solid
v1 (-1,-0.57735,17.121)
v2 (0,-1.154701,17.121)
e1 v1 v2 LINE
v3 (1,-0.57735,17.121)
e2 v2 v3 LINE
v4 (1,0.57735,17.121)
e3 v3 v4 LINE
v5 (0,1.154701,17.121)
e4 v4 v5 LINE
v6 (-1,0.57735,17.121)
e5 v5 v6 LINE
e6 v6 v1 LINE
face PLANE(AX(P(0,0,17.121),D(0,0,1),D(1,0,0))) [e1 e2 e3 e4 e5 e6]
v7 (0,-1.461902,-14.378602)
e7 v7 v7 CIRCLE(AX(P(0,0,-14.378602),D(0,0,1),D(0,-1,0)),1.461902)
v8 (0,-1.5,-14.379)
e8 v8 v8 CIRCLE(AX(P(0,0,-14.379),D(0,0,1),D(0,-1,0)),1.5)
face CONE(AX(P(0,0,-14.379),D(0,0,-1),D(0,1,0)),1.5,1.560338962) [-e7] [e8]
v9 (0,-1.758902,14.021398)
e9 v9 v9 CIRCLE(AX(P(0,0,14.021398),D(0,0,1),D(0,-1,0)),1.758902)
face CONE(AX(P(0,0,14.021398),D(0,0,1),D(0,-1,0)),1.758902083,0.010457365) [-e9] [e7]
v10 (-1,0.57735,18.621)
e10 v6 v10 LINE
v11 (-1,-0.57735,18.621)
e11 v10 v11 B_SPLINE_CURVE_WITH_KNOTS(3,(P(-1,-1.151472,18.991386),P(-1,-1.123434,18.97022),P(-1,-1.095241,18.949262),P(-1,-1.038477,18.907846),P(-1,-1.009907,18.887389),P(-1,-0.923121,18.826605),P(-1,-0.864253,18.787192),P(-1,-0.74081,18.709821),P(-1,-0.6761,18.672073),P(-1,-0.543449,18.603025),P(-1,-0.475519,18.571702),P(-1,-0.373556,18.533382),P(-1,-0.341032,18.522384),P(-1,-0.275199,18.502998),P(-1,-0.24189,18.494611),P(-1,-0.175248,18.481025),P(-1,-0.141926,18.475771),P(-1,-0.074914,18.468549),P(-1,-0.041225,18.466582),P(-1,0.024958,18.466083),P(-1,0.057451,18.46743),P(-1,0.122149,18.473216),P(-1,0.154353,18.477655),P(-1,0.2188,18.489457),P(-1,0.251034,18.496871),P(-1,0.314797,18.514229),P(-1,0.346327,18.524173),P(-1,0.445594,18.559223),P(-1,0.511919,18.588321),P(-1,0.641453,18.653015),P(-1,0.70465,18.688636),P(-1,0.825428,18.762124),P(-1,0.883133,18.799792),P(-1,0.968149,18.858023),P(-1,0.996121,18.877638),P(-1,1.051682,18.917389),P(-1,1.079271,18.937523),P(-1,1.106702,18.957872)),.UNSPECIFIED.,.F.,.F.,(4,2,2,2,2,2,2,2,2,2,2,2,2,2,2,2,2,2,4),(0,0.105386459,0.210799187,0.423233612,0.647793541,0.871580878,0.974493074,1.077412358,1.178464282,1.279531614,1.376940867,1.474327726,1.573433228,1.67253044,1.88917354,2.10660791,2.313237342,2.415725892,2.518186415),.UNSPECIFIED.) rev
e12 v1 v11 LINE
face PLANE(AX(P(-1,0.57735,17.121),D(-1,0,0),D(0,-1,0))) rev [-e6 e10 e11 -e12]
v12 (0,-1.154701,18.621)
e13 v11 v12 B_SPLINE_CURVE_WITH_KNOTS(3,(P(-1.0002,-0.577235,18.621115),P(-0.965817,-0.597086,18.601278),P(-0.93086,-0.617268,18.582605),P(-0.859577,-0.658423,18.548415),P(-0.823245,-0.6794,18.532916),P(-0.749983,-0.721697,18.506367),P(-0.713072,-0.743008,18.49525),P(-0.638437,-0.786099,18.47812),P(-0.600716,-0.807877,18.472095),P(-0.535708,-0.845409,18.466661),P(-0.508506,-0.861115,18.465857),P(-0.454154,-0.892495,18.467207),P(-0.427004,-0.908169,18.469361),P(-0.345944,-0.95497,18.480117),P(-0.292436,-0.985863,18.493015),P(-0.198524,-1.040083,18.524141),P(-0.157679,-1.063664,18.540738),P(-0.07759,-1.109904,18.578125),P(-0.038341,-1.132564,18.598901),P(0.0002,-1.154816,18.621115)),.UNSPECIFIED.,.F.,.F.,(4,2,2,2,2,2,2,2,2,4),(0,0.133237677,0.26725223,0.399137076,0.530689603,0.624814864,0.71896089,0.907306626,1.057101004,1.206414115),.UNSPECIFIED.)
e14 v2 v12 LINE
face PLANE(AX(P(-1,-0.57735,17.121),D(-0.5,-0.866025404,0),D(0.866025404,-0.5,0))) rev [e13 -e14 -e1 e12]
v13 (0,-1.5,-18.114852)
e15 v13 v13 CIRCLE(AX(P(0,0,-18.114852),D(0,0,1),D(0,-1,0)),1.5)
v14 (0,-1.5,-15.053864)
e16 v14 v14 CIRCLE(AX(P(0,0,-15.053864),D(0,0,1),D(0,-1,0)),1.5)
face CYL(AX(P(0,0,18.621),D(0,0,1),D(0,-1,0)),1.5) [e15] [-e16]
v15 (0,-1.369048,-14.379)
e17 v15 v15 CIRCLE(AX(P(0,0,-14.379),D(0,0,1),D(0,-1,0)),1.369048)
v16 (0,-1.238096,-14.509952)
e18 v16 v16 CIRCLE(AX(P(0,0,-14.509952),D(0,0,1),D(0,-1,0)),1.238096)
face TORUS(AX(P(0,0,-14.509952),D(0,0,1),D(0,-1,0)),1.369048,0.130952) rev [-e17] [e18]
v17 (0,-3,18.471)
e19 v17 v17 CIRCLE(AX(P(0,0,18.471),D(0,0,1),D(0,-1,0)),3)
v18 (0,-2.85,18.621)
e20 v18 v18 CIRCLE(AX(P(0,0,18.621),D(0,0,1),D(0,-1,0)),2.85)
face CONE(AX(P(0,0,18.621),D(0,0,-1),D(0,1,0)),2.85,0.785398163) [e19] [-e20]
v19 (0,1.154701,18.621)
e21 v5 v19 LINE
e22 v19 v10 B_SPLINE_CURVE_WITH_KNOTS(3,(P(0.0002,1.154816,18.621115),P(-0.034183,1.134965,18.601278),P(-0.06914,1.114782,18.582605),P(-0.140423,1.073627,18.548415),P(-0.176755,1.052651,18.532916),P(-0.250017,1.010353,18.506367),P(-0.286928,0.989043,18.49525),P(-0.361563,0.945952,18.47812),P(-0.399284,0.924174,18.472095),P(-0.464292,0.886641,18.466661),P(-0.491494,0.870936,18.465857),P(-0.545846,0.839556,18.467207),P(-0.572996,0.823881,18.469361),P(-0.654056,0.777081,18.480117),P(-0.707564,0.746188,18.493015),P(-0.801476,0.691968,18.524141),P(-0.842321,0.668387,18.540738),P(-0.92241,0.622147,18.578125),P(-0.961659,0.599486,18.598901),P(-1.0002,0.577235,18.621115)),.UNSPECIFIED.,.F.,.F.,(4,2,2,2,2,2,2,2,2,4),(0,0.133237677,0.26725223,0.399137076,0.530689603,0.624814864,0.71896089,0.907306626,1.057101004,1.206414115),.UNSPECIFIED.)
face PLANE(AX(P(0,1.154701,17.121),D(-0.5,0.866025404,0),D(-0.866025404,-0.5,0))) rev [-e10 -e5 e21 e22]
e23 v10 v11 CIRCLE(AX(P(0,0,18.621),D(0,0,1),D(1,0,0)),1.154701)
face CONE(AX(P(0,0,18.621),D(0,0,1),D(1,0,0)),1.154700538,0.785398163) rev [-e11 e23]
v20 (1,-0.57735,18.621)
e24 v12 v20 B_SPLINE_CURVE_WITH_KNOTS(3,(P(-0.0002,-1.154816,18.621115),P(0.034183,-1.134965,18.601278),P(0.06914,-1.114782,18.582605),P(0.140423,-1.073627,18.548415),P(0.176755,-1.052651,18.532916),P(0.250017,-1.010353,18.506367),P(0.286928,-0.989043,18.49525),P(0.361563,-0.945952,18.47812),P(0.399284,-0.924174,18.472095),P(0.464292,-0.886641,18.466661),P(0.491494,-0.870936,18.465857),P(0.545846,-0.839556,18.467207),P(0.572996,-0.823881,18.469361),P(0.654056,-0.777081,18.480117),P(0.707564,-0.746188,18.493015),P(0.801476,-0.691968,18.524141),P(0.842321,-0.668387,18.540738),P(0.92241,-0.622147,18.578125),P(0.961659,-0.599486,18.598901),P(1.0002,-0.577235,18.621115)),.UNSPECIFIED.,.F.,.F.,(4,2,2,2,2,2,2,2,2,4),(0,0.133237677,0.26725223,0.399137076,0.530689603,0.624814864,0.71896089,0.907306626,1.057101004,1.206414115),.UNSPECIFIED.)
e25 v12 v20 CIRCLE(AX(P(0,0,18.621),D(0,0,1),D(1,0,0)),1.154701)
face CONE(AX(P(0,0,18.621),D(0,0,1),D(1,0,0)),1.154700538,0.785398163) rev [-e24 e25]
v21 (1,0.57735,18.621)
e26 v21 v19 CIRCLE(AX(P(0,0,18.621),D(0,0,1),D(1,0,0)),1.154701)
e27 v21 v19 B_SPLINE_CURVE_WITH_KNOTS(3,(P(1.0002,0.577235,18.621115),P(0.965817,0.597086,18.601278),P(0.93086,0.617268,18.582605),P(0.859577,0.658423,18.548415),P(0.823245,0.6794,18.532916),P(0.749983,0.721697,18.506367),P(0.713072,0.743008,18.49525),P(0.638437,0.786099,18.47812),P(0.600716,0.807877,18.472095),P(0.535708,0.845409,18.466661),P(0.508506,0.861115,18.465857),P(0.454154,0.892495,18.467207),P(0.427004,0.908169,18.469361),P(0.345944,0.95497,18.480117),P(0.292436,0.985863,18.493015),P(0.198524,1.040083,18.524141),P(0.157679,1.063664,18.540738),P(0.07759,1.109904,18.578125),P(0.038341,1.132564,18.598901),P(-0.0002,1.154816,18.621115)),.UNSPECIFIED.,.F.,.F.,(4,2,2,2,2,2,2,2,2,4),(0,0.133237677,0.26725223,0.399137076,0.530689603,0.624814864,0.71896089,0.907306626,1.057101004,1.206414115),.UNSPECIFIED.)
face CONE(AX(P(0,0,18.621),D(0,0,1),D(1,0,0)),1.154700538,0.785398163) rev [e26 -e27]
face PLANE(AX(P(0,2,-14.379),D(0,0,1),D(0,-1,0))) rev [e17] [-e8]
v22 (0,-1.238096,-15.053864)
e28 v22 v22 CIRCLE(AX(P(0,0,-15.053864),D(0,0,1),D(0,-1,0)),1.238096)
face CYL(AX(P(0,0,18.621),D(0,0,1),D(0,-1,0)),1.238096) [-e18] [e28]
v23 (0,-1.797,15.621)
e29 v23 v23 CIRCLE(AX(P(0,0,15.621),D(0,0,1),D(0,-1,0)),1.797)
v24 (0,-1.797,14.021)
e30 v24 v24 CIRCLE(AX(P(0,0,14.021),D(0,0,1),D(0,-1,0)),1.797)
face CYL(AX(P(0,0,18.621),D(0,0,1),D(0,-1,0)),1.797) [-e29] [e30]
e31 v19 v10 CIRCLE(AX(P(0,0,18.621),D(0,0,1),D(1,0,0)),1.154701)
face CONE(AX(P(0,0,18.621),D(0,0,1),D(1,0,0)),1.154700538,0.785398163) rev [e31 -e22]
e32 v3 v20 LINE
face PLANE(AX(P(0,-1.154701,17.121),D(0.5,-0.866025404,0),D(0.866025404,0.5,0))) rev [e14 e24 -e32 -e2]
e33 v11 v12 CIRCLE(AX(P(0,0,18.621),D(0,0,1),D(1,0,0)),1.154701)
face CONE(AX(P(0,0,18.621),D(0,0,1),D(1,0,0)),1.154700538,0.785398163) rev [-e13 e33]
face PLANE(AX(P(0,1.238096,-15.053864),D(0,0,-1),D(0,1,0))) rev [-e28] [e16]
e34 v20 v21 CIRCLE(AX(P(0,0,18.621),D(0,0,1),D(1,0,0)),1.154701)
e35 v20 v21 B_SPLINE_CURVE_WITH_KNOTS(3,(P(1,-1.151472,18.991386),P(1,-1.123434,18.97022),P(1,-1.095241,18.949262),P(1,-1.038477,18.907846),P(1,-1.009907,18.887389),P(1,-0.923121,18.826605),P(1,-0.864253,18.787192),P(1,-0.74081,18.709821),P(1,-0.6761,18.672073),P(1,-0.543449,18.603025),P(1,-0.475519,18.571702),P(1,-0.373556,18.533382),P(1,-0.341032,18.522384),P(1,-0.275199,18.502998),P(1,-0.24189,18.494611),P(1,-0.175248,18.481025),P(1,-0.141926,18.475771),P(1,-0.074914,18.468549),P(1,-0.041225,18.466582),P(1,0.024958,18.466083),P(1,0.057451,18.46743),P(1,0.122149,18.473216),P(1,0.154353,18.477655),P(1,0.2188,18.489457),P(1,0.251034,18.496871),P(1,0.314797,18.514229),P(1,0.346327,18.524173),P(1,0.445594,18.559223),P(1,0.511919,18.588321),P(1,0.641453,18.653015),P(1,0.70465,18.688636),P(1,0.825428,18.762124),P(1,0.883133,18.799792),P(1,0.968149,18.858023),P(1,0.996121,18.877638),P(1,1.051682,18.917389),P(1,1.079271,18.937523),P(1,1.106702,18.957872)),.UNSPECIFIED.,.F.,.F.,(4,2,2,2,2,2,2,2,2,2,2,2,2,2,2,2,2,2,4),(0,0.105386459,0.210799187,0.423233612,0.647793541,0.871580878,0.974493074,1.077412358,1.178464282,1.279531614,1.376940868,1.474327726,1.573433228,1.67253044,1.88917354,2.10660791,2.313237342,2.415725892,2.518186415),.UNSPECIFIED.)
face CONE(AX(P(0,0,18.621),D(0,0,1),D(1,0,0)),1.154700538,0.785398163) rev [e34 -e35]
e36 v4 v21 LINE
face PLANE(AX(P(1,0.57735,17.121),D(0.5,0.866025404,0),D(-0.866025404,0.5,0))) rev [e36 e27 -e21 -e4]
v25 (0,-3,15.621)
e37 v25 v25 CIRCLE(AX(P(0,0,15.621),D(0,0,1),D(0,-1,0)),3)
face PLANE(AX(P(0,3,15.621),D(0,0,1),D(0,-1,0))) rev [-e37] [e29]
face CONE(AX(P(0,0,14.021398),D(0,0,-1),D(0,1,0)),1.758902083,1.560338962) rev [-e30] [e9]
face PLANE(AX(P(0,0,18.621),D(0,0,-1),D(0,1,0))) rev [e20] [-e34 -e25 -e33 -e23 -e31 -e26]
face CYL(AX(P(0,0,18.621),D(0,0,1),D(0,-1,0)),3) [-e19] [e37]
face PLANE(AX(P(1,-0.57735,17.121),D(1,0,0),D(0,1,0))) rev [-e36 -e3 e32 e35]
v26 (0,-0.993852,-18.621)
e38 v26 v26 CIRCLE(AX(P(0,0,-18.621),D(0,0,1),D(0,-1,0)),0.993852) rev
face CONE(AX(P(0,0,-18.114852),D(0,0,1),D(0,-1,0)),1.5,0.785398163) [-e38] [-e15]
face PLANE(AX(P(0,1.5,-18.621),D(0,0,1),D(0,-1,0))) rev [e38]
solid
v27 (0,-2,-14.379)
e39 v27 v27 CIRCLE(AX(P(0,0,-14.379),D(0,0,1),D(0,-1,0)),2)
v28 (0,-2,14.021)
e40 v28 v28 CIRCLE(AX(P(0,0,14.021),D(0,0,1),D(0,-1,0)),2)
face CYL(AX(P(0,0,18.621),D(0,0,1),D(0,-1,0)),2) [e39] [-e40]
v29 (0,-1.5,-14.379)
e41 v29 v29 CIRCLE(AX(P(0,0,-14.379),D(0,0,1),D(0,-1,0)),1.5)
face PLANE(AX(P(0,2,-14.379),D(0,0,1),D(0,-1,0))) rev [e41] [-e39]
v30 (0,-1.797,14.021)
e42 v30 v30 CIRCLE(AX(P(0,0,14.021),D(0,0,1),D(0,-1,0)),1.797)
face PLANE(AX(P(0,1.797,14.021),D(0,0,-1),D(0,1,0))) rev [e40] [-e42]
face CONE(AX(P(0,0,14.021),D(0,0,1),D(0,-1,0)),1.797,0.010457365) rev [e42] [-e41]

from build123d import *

# Parameters (mm, degrees)
CUT_EXTRUDE1_START = 18.621
CUT_EXTRUDE1_DEPTH = 1.5
CHAMFER2_SIZE      = 0.506148016


# Read off the part's stored shape, not the designer's step: Cut-Revolve-Thin1
with BuildPart() as part:
    # Sketch3 → Revolve1 (revolve)
    with BuildSketch(Plane(origin=(0, 0, 0), x_dir=(0, 0, -1), z_dir=(1, 0, 0)), mode=Mode.PRIVATE) as revolve1_sk:
        with BuildLine():
            Line((-18.621, 0), (-18.621, 2.805))
            Line((-18.621, 2.805), (-18.621, 3))
            Line((-18.621, 3), (-15.816, 3))
            Line((-15.816, 3), (-15.621, 3))
            Line((-15.621, 3), (-15.621, 1.797))
            Line((-15.621, 1.797), (-14.021, 1.797))
            Line((-14.021, 1.797), (-14.021, 2))
            Line((-14.021, 2), (14.379, 2))
            Line((14.379, 2), (14.379, 1.36904775))
            ThreePointArc((14.379, 1.36904775), (14.417355026, 1.276450526), (14.50995225, 1.2380955))
            Line((14.50995225, 1.2380955), (15.053864022, 1.2380955))
            Line((15.053864022, 1.2380955), (15.053864022, 1.5))
            Line((15.053864022, 1.5), (18.246, 1.5))
            Line((18.246, 1.5), (18.621, 1.5))
            Line((18.621, 1.5), (18.621, 0))
            Line((18.621, 0), (-18.621, 0))
        make_face()
    revolve(revolve1_sk.sketch.rotate(Axis((0, 0, 18.621), (0, 0, -1)), 180), axis=Axis((0, 0, 18.621), (0, 0, -1)))

    # Cut-Revolve-Thin1 outline → Cut-Revolve-Thin1 (revolve, cut)
    with BuildSketch(Plane.XZ):
        Polygon((1.758902083, 14.021398418), (1.461902083, -14.378601582), (1.5, -14.379), (1.797, 14.021), align=None)
    revolve(axis=Axis((0, 0, 0), (0, 0, 1)), mode=Mode.SUBTRACT)

    # Sketch4 → Cut-Extrude1 (cut)
    with BuildSketch(Plane.XY.offset(CUT_EXTRUDE1_START)):
        Polygon((0, 1.154700538), (-1, 0.577350269), (-1, -0.577350269), (0, -1.154700538), (1, -0.577350269), (1, 0.577350269), align=None)
    extrude(amount=-CUT_EXTRUDE1_DEPTH, mode=Mode.SUBTRACT)

    # Cut-Extrude2 cone 1 section (through the dimple's axis) → Cut-Extrude2 (revolve, cut)
    with BuildSketch(Plane(origin=(0, 0, 18.621), x_dir=(0, -1, 0), z_dir=(1, 0, 0))):
        Polygon((0, 0), (1.154700538, 0), (0, 1.154700538), align=None)
    revolve(axis=Axis((0, 0, 18.621), (0, 0, -1)), mode=Mode.SUBTRACT)

    # Chamfer2
    chamfer2_edges = [part.edges().sort_by_distance(p)[0] for p in [
        (0, 1.5, -18.621),
    ]]
    chamfer(chamfer2_edges, length=CHAMFER2_SIZE)

    # Sketch10 → Cut-Revolve2 (revolve, cut)
    with BuildSketch(Plane(origin=(0, 0, 0), x_dir=(0, 0, -1), z_dir=(1, 0, 0)), mode=Mode.PRIVATE) as cut_revolve2_sk:
        Polygon((-18.621, 2.85), (-18.471, 3), (-18.621, 3), align=None)
    revolve(cut_revolve2_sk.sketch.rotate(Axis((0, 0, 18.621), (0, 0, -1)), 180), axis=Axis((0, 0, 18.621), (0, 0, -1)), mode=Mode.SUBTRACT)


solid = part.part
